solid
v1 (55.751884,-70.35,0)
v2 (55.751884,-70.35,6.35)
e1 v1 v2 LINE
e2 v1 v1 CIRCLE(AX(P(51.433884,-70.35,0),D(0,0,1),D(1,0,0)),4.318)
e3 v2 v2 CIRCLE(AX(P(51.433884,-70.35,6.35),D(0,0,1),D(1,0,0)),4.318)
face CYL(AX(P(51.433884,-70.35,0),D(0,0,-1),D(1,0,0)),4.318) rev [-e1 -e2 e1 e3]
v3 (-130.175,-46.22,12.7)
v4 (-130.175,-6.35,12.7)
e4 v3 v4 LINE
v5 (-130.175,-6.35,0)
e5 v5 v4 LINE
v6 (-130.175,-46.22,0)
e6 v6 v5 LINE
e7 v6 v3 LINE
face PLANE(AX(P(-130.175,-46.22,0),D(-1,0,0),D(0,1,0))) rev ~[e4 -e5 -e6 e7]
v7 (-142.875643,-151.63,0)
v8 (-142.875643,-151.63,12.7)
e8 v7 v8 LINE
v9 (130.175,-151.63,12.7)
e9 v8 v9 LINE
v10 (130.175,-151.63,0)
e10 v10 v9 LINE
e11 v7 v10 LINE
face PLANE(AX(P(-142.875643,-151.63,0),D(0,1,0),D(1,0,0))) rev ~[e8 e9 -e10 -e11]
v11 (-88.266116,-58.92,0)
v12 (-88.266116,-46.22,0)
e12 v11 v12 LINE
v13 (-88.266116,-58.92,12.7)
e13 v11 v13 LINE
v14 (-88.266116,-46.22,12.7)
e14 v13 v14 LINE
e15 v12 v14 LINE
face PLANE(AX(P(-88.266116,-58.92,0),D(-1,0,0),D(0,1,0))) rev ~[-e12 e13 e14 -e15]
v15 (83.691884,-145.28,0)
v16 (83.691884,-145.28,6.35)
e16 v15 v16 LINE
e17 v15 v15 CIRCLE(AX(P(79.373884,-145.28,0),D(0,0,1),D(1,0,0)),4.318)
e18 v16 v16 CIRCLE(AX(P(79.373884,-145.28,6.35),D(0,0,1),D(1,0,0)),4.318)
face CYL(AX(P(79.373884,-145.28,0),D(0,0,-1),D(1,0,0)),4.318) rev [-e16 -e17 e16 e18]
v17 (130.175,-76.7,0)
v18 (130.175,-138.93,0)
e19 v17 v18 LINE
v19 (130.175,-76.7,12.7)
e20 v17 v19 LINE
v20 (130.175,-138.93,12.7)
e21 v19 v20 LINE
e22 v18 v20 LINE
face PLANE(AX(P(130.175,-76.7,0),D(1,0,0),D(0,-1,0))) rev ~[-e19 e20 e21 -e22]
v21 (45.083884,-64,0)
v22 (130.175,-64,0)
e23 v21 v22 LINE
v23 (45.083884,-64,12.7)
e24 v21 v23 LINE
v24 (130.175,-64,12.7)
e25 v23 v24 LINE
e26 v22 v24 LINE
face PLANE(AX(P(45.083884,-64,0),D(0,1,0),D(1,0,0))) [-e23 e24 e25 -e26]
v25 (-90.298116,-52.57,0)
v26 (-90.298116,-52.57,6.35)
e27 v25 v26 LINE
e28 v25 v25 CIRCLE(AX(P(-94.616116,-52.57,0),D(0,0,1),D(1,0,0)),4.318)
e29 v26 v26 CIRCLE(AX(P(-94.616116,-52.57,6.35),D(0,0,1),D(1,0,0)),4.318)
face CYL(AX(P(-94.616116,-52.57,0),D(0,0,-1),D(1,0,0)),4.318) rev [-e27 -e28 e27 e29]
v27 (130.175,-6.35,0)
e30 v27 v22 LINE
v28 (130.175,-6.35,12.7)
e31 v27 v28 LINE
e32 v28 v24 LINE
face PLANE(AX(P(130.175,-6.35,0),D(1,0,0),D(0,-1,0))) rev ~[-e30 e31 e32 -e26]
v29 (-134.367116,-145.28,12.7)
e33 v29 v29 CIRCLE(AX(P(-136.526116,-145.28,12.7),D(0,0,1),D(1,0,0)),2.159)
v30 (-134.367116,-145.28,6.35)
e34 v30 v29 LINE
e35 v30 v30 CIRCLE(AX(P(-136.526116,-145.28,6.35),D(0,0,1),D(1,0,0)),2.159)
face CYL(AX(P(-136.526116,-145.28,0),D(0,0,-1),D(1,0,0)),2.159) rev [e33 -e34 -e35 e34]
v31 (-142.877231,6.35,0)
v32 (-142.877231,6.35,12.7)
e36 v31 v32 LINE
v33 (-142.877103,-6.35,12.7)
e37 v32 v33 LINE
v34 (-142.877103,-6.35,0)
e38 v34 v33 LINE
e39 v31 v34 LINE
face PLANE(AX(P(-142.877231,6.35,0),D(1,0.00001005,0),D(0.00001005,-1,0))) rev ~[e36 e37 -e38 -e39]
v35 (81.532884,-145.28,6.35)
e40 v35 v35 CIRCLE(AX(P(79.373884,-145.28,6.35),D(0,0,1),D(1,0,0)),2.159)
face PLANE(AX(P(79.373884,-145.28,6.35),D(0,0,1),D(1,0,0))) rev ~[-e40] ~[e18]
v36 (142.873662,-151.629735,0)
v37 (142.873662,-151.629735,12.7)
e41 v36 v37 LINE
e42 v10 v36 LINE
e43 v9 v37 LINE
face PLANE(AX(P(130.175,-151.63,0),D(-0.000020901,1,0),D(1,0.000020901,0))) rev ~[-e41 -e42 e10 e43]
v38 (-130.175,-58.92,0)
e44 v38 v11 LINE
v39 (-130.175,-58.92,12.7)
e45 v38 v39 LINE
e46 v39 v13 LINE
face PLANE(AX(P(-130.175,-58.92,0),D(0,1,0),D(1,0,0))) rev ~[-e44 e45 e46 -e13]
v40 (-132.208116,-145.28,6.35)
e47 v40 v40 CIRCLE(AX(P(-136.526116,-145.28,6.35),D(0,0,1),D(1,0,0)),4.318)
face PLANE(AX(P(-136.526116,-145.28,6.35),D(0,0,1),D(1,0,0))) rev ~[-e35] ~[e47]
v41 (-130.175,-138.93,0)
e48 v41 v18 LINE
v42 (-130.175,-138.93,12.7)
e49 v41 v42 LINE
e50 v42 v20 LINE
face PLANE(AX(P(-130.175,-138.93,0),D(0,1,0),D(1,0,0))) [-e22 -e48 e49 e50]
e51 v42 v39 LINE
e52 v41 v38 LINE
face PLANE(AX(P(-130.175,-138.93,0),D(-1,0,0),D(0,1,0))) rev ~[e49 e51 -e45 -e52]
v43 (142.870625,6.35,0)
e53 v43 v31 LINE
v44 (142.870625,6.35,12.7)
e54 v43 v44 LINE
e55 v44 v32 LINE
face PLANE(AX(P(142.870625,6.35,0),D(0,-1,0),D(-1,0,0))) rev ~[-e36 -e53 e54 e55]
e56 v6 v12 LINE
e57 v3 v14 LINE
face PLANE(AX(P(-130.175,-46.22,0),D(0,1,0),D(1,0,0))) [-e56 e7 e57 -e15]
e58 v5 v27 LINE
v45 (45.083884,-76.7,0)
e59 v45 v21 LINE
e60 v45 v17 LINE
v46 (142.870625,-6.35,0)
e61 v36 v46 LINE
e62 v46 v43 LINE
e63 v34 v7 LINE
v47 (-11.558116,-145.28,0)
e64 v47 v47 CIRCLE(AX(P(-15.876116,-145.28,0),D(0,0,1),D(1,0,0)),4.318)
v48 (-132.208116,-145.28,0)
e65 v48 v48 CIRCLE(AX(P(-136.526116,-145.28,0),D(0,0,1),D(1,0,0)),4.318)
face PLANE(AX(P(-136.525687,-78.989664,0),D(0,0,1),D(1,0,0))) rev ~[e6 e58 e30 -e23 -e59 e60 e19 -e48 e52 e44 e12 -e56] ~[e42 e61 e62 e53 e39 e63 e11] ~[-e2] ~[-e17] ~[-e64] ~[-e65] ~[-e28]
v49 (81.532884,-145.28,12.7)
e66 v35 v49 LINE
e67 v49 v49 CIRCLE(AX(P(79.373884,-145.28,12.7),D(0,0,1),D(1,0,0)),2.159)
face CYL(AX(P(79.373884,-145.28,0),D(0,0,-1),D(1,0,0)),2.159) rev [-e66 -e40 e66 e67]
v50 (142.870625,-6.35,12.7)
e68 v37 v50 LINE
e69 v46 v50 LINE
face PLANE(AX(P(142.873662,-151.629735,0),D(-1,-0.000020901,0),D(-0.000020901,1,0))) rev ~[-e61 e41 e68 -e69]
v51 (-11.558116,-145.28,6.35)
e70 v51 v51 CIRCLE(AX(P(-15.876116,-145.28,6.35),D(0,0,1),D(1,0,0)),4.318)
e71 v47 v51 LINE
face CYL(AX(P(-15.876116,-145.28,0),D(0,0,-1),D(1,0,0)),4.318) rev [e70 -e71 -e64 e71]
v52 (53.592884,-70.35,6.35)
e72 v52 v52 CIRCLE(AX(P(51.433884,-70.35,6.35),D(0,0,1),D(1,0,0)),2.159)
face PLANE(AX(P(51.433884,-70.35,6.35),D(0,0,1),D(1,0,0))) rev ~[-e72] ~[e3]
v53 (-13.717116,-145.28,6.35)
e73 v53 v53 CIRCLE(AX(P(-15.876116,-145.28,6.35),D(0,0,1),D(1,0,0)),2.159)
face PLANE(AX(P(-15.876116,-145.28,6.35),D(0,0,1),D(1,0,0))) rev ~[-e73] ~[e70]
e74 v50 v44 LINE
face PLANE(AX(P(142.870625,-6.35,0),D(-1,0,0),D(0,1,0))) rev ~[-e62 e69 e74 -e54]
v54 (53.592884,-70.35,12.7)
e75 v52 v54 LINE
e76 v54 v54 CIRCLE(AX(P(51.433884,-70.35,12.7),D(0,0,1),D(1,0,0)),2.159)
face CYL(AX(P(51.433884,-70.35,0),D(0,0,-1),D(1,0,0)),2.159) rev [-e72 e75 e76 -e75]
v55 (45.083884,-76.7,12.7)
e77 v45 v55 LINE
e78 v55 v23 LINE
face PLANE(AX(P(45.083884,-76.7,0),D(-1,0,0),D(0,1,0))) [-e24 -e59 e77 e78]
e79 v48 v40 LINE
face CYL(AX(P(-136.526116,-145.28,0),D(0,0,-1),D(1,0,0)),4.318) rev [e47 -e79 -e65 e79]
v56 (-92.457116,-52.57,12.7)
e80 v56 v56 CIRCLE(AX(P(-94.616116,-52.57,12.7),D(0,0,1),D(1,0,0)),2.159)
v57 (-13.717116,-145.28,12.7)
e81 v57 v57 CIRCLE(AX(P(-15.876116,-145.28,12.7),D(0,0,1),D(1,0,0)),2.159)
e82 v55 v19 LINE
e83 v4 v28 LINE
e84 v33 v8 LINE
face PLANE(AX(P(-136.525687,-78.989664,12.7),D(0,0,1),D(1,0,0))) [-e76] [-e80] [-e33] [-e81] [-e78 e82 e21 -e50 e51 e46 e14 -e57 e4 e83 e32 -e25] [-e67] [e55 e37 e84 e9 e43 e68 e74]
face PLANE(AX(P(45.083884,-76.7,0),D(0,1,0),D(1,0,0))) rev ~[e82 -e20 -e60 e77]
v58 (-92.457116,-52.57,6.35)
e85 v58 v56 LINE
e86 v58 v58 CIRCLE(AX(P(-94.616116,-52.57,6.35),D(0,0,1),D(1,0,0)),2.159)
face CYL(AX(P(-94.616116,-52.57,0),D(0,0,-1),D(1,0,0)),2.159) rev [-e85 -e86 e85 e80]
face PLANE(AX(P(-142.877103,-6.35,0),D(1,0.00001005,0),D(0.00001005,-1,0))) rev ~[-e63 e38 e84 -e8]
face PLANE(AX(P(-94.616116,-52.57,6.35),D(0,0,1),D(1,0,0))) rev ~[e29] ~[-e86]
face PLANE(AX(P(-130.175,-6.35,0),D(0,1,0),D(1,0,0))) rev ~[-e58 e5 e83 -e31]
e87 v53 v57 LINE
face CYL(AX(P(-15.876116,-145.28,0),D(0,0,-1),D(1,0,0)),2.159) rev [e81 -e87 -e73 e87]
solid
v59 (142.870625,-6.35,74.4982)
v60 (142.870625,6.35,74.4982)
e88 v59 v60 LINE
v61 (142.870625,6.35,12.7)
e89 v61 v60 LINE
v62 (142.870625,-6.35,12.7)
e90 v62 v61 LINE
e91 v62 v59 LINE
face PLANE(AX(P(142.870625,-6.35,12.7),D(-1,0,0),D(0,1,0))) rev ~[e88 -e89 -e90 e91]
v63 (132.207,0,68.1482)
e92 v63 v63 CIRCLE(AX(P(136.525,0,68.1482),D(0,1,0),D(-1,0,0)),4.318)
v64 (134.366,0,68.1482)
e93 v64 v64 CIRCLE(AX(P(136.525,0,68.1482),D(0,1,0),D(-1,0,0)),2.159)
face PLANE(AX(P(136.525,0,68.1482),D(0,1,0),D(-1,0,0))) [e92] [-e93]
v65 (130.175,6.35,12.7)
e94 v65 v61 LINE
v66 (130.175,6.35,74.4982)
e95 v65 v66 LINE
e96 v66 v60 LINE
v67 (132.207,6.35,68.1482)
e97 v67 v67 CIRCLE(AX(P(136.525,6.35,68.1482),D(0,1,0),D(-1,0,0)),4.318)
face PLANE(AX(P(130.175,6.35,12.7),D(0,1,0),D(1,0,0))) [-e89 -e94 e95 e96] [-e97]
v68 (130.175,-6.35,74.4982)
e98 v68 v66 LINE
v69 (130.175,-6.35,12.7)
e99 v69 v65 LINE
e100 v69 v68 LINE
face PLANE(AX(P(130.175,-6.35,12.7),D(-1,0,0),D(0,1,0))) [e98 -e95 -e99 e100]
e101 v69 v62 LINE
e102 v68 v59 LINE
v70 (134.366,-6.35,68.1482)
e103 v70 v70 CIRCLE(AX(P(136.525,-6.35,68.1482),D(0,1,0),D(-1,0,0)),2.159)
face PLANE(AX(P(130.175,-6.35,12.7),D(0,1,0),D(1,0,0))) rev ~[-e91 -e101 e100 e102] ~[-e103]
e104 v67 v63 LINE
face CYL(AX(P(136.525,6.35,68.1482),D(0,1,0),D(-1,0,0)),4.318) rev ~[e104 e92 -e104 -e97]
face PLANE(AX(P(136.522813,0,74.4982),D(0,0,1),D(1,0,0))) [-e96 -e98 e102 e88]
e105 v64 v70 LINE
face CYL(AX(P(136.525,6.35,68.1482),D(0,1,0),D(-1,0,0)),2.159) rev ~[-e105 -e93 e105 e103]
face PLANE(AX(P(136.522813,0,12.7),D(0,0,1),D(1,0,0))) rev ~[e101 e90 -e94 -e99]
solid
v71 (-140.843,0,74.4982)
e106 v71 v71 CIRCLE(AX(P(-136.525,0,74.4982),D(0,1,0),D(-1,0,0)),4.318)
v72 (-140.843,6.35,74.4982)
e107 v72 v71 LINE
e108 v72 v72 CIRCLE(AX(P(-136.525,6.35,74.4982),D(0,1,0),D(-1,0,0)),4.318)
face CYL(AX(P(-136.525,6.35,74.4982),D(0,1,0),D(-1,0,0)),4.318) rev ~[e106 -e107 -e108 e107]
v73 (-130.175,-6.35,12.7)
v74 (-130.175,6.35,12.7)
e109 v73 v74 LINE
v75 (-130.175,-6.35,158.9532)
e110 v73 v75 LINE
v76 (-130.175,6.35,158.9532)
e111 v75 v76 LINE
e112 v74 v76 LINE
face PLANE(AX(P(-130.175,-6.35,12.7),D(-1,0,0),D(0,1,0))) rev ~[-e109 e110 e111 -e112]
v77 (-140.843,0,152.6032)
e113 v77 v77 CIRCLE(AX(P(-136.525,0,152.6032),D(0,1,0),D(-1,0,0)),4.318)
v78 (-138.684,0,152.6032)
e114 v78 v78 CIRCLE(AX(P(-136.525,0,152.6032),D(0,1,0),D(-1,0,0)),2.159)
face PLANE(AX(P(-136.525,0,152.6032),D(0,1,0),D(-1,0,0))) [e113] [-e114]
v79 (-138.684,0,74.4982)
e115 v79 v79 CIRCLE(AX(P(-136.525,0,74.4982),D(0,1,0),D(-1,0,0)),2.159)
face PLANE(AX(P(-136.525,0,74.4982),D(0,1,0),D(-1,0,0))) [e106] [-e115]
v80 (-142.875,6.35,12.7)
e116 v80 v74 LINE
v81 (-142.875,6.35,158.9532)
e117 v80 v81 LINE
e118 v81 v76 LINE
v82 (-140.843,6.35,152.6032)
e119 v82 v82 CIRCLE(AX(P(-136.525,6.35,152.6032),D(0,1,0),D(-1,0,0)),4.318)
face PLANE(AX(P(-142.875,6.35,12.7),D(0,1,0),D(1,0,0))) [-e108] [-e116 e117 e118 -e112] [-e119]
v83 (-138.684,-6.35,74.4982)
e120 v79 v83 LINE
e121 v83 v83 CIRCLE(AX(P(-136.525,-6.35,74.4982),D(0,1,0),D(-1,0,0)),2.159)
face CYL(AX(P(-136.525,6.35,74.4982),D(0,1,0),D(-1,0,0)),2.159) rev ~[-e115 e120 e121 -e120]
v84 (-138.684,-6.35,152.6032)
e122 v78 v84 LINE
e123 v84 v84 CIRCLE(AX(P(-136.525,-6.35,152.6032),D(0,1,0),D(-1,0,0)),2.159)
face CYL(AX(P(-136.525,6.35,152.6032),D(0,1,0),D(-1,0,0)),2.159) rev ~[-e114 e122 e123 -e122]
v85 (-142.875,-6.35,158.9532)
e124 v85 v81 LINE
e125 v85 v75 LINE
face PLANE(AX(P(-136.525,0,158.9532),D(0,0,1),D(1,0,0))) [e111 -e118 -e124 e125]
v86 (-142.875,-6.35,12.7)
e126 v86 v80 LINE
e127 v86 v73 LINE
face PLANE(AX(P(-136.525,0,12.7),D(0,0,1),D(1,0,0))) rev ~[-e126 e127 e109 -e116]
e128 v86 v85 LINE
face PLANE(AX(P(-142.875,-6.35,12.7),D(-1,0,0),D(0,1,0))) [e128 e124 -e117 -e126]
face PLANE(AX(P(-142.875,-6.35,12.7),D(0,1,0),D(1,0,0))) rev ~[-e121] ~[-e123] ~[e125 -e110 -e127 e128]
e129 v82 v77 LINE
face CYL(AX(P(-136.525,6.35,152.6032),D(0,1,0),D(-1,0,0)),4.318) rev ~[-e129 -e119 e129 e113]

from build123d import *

# Parameters (mm, degrees)
F0_R      = 4.318
F0_W      = 260.35
F0_H      = 12.7
F0_W_2    = 41.9088844856
F0_W_3    = 12.695625494
F0_W_4    = 85.0911155144
F0_R_2    = 2.159
F1_DEPTH  = 12.7
F2_W      = 12.7
F2_H      = 12.7
F3_DEPTH  = 146.2532
F2_W_2    = 12.695625494
F4_DEPTH  = 61.7982
F6_R      = 2.159
F7_DEPTH  = 12.7
F5_R      = 2.159
F8_DEPTH  = 12.7
F6_R_2    = 4.318
F9_DEPTH  = 6.35
F5_R_2    = 4.318
F10_DEPTH = 6.35
F11_DEPTH = 6.35


# Not quite as in the source:
# - a feature names something its author has since deleted; it is built from what else it names


with BuildPart() as f1:
    # F0 (on Top) → F1 (new body)
    with BuildSketch(Plane.XY):
        Polygon((-142.8771033979, -6.35), (-142.8756433805, -151.63), (-130.175, -151.63), (-130.175, -138.93), (-130.175, -58.92), (-130.175, -46.22), (-130.175, -6.35), align=None)
        with Locations((-136.5261155144, -145.28)):
            Circle(F0_R, mode=Mode.SUBTRACT)
        with Locations((0, -145.28)):
            Rectangle(F0_W, F0_H)
        with Locations((-15.8761155144, -145.28)):
            Circle(F0_R, mode=Mode.SUBTRACT)
        with Locations((79.3738844856, -145.28)):
            Circle(F0_R, mode=Mode.SUBTRACT)
        Polygon((-142.8772310289, 6.35), (-142.8771033979, -6.35), (-130.175, -6.35), (-130.175, 6.35), align=None)
        Polygon((130.175, -138.93), (130.175, -151.63), (142.8736619349, -151.6297345897), (142.870625494, -6.35), (130.175, -6.35), (130.175, -64), (130.175, -76.7), align=None)
        Rectangle(F0_W, F0_H)
        with Locations((-109.2205577572, -52.57)):
            Rectangle(F0_W_2, F0_H)
        with Locations((-94.6161155144, -52.57)):
            Circle(F0_R, mode=Mode.SUBTRACT)
        with Locations((136.522812747, 0)):
            Rectangle(F0_W_3, F0_H)
        with Locations((87.6294422428, -70.35)):
            Rectangle(F0_W_4, F0_H)
        with Locations((51.4338844856, -70.35)):
            Circle(F0_R, mode=Mode.SUBTRACT)
        with Locations((-94.6161155144, -52.57)):
            Circle(F0_R)
        with Locations((-94.6161155144, -52.57)):
            Circle(F0_R_2, mode=Mode.SUBTRACT)
        with Locations((51.4338844856, -70.35)):
            Circle(F0_R)
        with Locations((51.4338844856, -70.35)):
            Circle(F0_R_2, mode=Mode.SUBTRACT)
        with Locations((-136.5261155144, -145.28)):
            Circle(F0_R)
        with Locations((-136.5261155144, -145.28)):
            Circle(F0_R_2, mode=Mode.SUBTRACT)
        with Locations((-15.8761155144, -145.28)):
            Circle(F0_R)
        with Locations((-15.8761155144, -145.28)):
            Circle(F0_R_2, mode=Mode.SUBTRACT)
        with Locations((79.3738844856, -145.28)):
            Circle(F0_R)
        with Locations((79.3738844856, -145.28)):
            Circle(F0_R_2, mode=Mode.SUBTRACT)
    extrude(amount=F1_DEPTH)

    # F0 (on Top) → F11 (cut)
    with BuildSketch(Plane.XY):
        with Locations((-136.5261155144, -145.28)):
            Circle(F0_R)
        with Locations((-136.5261155144, -145.28)):
            Circle(F0_R_2, mode=Mode.SUBTRACT)
        with Locations((-15.8761155144, -145.28)):
            Circle(F0_R)
        with Locations((-15.8761155144, -145.28)):
            Circle(F0_R_2, mode=Mode.SUBTRACT)
        with Locations((79.3738844856, -145.28)):
            Circle(F0_R)
        with Locations((79.3738844856, -145.28)):
            Circle(F0_R_2, mode=Mode.SUBTRACT)
        with Locations((51.4338844856, -70.35)):
            Circle(F0_R)
        with Locations((51.4338844856, -70.35)):
            Circle(F0_R_2, mode=Mode.SUBTRACT)
        with Locations((-94.6161155144, -52.57)):
            Circle(F0_R)
        with Locations((-94.6161155144, -52.57)):
            Circle(F0_R_2, mode=Mode.SUBTRACT)
    extrude(amount=F11_DEPTH, mode=Mode.SUBTRACT)


with BuildPart() as f3:
    # F2 (on face) → F3 (new body)
    with BuildSketch(Plane.XY.offset(12.7)):
        with Locations((-136.525, 0)):
            Rectangle(F2_W, F2_H)
    extrude(amount=F3_DEPTH)

    # F5 (on face) → F8 (cut, through all)
    with BuildSketch(Plane(origin=(0, 6.35, 0), x_dir=(-1, 0, 0), z_dir=(0, 1, 0))):
        with Locations((136.525, 152.6032)):
            Circle(F5_R)
        with Locations((136.525, 74.4982)):
            Circle(F5_R)
    extrude(amount=-F8_DEPTH, mode=Mode.SUBTRACT)

    # F5 (on face) → F10 (cut)
    with BuildSketch(Plane(origin=(0, 6.35, 0), x_dir=(-1, 0, 0), z_dir=(0, 1, 0))):
        with Locations((136.525, 152.6032)):
            Circle(F5_R_2)
        with Locations((136.525, 152.6032)):
            Circle(F5_R, mode=Mode.SUBTRACT)
        with Locations((136.525, 74.4982)):
            Circle(F5_R_2)
        with Locations((136.525, 74.4982)):
            Circle(F5_R, mode=Mode.SUBTRACT)
    extrude(amount=-F10_DEPTH, mode=Mode.SUBTRACT)


with BuildPart() as f4:
    # F2 (on face) → F4 (new body)
    with BuildSketch(Plane.XY.offset(12.7)):
        with Locations((136.522812747, 0)):
            Rectangle(F2_W_2, F2_H)
    extrude(amount=F4_DEPTH)

    # F6 (on face) → F7 (cut, through all)
    with BuildSketch(Plane(origin=(0, 6.35, 0), x_dir=(-1, 0, 0), z_dir=(0, 1, 0))):
        with Locations((-136.525, 68.1482)):
            Circle(F6_R)
    extrude(amount=-F7_DEPTH, mode=Mode.SUBTRACT)

    # F6 (on face) → F9 (cut)
    with BuildSketch(Plane(origin=(0, 6.35, 0), x_dir=(-1, 0, 0), z_dir=(0, 1, 0))):
        with Locations((-136.525, 68.1482)):
            Circle(F6_R_2)
        with Locations((-136.525, 68.1482)):
            Circle(F6_R, mode=Mode.SUBTRACT)
    extrude(amount=-F9_DEPTH, mode=Mode.SUBTRACT)


solid = Compound([f1.part, f3.part, f4.part])
